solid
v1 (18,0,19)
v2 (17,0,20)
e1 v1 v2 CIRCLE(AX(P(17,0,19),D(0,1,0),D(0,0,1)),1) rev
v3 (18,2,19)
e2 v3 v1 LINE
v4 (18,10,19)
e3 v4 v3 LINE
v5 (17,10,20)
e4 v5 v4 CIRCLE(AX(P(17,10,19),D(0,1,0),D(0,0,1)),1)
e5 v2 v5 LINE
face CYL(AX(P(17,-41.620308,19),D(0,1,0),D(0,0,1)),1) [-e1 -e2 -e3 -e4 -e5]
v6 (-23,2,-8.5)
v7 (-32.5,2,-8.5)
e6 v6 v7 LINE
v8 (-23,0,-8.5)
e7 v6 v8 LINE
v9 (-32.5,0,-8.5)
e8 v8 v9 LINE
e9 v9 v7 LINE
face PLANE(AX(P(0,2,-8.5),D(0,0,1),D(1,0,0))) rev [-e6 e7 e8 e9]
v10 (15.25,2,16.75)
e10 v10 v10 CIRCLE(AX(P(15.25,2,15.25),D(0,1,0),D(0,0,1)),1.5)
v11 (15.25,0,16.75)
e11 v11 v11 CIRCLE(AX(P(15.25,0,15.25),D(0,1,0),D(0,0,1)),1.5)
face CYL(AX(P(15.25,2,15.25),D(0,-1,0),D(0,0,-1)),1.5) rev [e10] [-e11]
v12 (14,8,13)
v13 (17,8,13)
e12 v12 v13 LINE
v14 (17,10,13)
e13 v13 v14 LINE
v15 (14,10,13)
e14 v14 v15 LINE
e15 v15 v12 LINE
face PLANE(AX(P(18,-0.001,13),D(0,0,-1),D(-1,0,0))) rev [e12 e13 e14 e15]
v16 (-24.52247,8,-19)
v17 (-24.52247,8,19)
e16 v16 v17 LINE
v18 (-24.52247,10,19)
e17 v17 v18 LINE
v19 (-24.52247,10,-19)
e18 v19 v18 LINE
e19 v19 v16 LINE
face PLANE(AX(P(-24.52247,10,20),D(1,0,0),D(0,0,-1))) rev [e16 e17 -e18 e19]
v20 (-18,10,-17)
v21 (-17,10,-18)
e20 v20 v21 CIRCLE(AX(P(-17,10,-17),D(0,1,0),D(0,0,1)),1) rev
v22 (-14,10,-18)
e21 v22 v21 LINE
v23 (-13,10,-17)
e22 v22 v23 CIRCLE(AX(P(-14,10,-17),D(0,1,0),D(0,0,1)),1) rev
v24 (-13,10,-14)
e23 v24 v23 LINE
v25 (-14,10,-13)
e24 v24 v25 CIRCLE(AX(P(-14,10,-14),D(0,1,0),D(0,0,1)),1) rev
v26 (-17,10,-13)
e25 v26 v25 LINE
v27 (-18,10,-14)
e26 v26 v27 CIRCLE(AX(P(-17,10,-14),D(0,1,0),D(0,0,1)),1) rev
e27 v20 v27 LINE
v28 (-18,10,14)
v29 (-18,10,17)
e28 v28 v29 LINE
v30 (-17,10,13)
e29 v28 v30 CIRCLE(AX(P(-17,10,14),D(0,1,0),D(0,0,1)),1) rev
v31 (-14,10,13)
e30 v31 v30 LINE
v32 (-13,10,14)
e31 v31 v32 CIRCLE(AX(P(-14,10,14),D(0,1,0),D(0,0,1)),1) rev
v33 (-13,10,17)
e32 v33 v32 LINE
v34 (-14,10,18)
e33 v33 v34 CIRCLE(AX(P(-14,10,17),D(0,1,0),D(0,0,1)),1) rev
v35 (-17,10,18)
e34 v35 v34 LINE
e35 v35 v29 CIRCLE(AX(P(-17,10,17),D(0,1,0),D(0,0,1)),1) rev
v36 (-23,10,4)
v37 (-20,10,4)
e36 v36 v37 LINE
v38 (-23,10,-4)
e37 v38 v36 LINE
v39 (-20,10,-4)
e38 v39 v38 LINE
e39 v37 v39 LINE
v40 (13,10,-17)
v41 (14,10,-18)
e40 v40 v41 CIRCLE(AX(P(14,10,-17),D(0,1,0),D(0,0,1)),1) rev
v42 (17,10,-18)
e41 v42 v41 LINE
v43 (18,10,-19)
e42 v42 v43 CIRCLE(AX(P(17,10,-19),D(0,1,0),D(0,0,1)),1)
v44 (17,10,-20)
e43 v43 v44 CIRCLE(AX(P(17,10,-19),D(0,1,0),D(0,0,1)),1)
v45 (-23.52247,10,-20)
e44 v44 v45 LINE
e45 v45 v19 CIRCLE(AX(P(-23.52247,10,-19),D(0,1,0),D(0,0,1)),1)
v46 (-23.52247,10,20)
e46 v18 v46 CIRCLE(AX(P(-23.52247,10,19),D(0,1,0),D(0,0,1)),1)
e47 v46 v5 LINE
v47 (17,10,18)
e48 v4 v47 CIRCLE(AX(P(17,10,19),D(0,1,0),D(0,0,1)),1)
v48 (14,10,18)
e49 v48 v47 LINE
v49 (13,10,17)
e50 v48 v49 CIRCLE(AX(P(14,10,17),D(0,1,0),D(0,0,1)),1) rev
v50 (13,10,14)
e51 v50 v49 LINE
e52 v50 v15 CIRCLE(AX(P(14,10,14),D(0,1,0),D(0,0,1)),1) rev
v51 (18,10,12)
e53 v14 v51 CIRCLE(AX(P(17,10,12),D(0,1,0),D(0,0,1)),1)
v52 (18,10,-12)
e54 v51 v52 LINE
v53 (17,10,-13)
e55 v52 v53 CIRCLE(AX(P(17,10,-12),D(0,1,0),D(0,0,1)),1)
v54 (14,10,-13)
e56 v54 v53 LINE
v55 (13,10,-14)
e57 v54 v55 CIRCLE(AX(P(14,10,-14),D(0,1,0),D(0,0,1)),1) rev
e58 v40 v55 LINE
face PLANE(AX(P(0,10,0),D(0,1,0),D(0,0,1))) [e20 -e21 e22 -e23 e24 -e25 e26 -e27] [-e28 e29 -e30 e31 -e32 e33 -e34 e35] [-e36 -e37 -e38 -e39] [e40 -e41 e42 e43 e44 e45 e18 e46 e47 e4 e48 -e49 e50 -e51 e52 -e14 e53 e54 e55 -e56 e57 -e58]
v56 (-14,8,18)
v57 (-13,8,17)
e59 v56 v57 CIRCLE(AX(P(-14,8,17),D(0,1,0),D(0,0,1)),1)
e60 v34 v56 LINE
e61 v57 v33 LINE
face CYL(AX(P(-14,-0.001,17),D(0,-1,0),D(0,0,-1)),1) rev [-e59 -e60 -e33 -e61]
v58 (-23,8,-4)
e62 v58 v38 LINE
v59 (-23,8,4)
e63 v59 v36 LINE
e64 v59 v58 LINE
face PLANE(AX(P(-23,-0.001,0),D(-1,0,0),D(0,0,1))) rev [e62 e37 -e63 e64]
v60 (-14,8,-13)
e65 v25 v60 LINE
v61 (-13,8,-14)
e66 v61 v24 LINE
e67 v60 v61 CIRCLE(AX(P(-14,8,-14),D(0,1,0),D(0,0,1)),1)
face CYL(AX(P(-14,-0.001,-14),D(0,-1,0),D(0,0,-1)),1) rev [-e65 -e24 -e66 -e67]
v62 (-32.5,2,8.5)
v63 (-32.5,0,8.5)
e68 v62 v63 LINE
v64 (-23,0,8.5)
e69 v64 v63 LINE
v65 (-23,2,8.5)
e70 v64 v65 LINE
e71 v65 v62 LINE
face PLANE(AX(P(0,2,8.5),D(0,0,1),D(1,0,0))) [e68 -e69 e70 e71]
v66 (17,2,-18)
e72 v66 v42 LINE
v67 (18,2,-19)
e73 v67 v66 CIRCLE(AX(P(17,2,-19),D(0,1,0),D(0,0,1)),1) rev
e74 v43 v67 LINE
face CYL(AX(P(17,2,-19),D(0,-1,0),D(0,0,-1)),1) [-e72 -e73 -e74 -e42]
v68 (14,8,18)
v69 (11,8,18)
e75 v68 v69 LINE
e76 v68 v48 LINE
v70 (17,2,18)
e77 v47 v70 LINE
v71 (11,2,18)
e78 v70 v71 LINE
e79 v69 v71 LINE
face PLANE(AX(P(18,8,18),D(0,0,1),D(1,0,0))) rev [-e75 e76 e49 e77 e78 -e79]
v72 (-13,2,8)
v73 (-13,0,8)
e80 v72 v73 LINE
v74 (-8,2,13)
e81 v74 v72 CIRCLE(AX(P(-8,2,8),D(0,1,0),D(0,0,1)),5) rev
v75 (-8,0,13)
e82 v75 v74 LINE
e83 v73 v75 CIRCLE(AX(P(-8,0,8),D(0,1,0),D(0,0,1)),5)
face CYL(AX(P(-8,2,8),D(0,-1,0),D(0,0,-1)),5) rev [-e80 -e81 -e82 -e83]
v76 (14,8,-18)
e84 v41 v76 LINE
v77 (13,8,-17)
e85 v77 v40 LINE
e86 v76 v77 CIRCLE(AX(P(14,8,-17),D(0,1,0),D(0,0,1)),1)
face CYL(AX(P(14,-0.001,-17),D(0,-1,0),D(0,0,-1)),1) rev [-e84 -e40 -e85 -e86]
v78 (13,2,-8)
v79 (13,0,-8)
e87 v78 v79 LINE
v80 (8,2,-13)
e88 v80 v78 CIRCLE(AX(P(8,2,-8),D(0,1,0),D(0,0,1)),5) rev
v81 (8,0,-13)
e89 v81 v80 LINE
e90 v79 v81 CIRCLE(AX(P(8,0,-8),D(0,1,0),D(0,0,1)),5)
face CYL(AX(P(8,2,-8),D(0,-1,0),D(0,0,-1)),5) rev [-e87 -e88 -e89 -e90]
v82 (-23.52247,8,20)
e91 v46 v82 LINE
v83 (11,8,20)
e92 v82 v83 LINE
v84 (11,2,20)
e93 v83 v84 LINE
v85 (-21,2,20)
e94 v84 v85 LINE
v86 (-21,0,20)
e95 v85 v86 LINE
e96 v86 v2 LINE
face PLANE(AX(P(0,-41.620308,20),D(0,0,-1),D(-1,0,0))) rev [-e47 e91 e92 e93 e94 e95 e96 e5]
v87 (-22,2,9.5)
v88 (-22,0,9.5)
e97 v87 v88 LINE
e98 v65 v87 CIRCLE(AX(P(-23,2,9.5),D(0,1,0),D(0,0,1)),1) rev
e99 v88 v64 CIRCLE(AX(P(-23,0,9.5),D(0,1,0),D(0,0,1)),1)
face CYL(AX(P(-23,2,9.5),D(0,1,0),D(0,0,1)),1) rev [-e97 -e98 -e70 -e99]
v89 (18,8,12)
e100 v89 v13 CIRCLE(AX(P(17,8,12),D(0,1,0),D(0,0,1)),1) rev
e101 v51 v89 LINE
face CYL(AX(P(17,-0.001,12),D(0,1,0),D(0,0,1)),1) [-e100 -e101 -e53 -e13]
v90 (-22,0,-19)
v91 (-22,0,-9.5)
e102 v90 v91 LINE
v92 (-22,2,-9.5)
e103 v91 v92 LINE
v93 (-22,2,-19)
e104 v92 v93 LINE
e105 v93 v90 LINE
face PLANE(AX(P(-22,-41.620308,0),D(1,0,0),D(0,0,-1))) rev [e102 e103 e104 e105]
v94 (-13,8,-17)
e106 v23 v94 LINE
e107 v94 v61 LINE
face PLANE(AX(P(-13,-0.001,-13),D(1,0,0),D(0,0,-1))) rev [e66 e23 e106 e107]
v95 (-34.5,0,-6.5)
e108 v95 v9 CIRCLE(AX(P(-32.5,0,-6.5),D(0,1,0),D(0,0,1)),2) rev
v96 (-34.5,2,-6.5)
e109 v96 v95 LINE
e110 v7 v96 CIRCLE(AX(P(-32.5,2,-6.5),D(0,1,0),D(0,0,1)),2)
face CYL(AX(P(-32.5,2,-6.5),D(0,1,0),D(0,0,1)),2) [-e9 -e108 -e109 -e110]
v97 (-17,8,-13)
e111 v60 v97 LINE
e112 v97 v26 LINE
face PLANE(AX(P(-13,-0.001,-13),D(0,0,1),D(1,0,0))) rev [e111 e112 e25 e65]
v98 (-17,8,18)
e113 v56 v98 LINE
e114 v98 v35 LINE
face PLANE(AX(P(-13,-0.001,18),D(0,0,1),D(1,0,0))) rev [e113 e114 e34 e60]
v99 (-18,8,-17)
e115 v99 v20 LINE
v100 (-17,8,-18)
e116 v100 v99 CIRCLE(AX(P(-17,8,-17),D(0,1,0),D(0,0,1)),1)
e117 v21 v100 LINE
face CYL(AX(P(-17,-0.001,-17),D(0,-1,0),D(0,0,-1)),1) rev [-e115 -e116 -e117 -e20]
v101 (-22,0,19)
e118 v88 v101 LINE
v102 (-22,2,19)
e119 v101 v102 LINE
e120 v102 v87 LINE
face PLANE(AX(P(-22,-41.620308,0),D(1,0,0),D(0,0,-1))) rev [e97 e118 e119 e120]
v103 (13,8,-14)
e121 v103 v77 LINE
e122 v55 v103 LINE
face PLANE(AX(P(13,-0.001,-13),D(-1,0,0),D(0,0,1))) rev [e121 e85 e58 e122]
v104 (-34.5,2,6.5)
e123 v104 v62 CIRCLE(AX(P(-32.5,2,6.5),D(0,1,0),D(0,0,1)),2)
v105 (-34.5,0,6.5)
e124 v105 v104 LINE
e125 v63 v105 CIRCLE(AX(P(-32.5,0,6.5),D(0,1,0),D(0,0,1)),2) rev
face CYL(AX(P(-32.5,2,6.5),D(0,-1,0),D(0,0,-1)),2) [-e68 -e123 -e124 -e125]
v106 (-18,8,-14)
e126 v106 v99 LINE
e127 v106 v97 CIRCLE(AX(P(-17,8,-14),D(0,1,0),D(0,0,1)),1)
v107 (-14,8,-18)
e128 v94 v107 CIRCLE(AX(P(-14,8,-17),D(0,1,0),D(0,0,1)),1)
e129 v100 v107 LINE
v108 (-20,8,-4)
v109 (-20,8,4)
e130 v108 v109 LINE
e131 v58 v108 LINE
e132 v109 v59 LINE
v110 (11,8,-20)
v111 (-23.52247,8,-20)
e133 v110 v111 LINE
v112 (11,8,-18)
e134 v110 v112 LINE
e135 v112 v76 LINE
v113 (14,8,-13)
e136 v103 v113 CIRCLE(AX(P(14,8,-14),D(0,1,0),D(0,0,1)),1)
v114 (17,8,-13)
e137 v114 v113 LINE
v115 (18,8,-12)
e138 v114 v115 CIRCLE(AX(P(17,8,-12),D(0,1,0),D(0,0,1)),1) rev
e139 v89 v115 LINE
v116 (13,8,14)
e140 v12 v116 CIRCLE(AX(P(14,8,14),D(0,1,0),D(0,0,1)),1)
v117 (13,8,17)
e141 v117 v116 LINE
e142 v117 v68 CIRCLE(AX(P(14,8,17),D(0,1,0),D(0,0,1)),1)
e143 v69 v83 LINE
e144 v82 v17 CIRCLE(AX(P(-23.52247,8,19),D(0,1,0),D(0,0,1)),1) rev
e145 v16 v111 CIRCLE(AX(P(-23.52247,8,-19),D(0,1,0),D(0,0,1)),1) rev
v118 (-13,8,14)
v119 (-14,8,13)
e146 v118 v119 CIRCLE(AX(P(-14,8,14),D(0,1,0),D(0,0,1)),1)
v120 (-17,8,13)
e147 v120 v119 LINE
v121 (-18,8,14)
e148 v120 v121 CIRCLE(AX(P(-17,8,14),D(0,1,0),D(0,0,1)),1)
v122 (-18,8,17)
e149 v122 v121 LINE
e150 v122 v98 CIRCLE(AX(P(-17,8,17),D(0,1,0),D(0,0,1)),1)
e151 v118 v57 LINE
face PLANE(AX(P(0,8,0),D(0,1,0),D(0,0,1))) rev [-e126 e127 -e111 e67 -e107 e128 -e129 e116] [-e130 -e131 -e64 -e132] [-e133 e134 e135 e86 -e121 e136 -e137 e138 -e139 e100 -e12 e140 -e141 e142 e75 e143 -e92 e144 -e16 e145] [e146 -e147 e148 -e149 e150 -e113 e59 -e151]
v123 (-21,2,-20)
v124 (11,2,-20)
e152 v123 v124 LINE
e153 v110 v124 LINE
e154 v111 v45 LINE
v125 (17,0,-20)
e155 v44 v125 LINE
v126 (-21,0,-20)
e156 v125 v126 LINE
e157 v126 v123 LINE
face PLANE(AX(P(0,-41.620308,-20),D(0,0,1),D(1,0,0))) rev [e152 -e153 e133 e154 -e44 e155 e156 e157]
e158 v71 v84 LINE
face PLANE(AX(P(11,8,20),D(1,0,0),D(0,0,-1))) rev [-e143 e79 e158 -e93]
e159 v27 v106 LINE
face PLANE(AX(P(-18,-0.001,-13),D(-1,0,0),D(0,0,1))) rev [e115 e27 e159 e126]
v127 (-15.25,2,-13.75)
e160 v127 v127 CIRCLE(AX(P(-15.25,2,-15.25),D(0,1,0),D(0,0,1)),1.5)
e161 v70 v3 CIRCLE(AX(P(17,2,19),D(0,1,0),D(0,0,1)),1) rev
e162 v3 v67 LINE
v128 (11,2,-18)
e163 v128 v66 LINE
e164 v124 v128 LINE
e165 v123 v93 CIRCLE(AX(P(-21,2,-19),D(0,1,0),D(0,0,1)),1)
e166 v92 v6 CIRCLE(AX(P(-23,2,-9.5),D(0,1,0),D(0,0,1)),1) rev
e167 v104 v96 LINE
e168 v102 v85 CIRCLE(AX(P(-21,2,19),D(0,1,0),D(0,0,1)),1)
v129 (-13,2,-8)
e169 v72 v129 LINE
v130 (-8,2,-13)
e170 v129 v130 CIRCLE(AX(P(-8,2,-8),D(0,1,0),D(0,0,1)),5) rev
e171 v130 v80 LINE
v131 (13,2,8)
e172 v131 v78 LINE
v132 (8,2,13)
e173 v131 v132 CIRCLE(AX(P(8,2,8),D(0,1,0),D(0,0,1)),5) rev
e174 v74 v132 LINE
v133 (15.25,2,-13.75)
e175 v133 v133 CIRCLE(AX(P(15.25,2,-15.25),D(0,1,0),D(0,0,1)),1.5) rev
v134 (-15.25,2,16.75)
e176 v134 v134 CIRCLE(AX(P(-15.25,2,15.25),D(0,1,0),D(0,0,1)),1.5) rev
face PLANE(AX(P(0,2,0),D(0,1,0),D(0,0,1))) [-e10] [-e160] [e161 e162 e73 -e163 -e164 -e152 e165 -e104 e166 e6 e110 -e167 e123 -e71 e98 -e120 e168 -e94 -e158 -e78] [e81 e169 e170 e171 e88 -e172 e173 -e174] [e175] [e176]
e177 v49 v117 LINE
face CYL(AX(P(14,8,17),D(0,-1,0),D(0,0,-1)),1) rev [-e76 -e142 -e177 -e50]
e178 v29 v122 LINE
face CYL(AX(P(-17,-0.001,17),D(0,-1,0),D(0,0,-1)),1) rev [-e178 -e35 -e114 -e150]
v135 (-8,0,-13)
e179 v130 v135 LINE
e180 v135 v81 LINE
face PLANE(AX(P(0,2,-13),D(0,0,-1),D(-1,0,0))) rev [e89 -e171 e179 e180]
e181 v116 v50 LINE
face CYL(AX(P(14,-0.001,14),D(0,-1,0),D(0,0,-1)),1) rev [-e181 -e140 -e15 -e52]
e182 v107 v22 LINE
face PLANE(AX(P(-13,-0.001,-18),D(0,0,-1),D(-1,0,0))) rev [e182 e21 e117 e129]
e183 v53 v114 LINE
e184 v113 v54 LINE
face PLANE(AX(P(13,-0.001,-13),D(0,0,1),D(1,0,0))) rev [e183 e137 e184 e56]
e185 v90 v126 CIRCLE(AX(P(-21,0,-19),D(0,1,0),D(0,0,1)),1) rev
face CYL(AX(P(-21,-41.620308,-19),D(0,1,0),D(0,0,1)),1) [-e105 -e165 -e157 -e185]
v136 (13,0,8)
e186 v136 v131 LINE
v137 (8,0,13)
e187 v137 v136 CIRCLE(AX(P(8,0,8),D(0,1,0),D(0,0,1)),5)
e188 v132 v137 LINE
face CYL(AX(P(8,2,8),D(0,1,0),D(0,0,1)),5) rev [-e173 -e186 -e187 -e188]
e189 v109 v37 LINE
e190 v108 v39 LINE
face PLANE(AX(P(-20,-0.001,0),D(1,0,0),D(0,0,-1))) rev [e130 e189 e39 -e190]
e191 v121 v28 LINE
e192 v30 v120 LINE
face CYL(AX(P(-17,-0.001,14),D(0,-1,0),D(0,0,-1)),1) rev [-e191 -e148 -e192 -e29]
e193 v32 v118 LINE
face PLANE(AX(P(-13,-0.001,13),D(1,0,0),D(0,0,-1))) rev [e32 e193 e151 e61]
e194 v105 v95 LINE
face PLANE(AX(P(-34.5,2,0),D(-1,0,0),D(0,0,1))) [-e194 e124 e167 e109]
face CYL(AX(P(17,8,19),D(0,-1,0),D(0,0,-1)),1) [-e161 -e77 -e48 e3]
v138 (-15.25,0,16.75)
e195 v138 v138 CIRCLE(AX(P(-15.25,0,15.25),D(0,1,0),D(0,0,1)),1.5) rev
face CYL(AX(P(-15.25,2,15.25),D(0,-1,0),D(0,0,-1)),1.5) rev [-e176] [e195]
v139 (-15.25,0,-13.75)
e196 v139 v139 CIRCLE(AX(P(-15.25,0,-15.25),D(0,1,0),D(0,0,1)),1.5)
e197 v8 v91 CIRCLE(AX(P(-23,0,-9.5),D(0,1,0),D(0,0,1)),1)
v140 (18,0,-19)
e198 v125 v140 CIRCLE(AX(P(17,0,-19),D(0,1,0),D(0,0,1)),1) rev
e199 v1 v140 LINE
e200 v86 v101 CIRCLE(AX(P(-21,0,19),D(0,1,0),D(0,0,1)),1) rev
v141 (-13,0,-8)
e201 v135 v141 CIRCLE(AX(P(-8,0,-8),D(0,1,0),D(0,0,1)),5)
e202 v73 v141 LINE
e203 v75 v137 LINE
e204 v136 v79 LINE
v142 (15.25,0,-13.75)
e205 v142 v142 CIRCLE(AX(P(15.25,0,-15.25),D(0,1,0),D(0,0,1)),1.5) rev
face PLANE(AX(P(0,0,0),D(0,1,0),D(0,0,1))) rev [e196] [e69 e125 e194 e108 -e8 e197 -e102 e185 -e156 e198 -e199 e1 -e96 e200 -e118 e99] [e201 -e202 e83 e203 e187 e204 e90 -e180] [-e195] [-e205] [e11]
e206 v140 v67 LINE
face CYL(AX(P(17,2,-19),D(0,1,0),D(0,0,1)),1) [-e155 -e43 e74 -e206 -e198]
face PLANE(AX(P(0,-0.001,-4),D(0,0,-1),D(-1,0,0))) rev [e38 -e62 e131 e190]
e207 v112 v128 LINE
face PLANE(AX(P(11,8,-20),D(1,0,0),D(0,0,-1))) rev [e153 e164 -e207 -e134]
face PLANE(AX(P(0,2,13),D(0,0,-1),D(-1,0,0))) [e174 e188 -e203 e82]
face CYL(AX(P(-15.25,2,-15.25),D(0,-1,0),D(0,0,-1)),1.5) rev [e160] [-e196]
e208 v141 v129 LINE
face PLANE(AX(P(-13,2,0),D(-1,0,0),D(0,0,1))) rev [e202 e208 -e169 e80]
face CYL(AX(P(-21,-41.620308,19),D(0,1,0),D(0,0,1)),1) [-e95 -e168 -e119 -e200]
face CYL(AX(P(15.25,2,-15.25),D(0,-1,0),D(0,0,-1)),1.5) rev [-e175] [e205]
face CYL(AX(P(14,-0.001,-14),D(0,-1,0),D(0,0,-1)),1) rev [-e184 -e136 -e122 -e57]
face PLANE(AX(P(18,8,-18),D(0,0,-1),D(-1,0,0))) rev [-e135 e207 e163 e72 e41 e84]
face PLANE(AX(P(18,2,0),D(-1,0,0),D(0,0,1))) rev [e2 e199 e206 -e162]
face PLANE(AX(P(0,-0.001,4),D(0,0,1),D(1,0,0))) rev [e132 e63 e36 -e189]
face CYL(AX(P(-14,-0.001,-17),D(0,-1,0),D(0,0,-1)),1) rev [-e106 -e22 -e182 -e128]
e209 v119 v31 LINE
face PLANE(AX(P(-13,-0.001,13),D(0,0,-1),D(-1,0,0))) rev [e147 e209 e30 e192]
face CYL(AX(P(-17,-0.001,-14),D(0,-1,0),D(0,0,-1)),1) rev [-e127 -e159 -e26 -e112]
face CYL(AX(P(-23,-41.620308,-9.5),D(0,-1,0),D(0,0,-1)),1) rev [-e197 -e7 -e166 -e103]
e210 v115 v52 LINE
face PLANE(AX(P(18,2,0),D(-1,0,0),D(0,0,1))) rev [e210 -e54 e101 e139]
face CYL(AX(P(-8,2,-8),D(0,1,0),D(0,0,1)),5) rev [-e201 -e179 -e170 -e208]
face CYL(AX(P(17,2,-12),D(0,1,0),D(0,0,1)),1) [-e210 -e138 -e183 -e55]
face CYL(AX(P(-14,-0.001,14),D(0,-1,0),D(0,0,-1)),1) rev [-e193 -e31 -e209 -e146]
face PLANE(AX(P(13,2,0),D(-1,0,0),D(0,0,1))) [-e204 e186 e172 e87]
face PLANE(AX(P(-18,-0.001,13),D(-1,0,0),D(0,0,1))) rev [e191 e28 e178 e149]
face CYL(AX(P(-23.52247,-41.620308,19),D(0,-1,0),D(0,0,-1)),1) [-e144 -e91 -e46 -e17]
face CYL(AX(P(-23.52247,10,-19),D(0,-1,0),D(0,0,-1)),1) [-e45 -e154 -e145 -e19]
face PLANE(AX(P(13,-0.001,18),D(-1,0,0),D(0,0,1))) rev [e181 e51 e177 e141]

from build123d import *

# Parameters (mm, degrees)
CROQUIS1_W              = 16.5
CROQUIS1_H              = 17
CROQUIS1_R              = 1.5
CROQUIS1_W_2            = 5
SALIENTE_EXTRUIR1_DEPTH = 2
SALIENTE_EXTRUIR2_DEPTH = 2
CROQUIS4_W              = 7
CROQUIS4_H              = 2
SALIENTE_EXTRUIR3_DEPTH = 6
CROQUIS7_W              = 42.522469992
CROQUIS7_H              = 40
SALIENTE_EXTRUIR5_DEPTH = 2
CORTAR_EXTRUIR1_REACH   = 43.113
CROQUIS8_W              = 5
CROQUIS8_H              = 5
REDONDEO1_R             = 5
REDONDEO2_R             = 2
CORTAR_EXTRUIR3_REACH   = 43.113
CROQUIS12_W             = 3
CROQUIS12_H             = 8
REDONDEO3_R             = 1


with BuildPart() as part:
    # Croquis1 → Saliente-Extruir1 (new body)
    # profile 1 of 3: a face of its own
    with BuildSketch(Plane(origin=(0, 0, 0), x_dir=(1, 0, 0), z_dir=(0, 1, 0))):
        with Locations((-26.25, 0)):
            Rectangle(CROQUIS1_W, CROQUIS1_H)
    # profile 2 of 3: a face of its own
    with BuildSketch(Plane(origin=(0, 0, 0), x_dir=(1, 0, 0), z_dir=(0, 1, 0))):
        Polygon((13, -13), (-13, -13), (-13, -8.5), (-18, -8.5), (-18, -18), (18, -18), (18, 18), (-18, 18), (-18, 8.5), (-13, 8.5), (-13, 13), (13, 13), align=None)
        with Locations(Location((-15.25, -15.25, 0), (0, 0, 270))):
            Circle(CROQUIS1_R, mode=Mode.SUBTRACT)
        with Locations(Location((15.25, -15.25, 0), (0, 0, 270))):
            Circle(CROQUIS1_R, mode=Mode.SUBTRACT)
        with Locations(Location((-15.25, 15.25, 0), (0, 0, 270))):
            Circle(CROQUIS1_R, mode=Mode.SUBTRACT)
        with Locations(Location((15.25, 15.25, 0), (0, 0, 270))):
            Circle(CROQUIS1_R, mode=Mode.SUBTRACT)
    # profile 3 of 3: a face of its own
    with BuildSketch(Plane(origin=(0, 0, 0), x_dir=(1, 0, 0), z_dir=(0, 1, 0))):
        with Locations((-15.5, 0)):
            Rectangle(CROQUIS1_W_2, CROQUIS1_H)
    extrude(amount=SALIENTE_EXTRUIR1_DEPTH)

    # Croquis2 → Saliente-Extruir2 (add)
    with BuildSketch(Plane(origin=(0, 2, 0), x_dir=(1, 0, 0), z_dir=(0, 1, 0))):
        Polygon((18, 18), (18, 20), (-22, 20), (-22, 8.5), (-18, 8.5), (-18, 18), align=None)
        Polygon((18, -20), (18, -18), (-18, -18), (-18, -8.5), (-22, -8.5), (-22, -20), align=None)
    extrude(amount=-SALIENTE_EXTRUIR2_DEPTH)

    # Croquis4 → Saliente-Extruir3 (add)
    with BuildSketch(Plane(origin=(0, 2, 0), x_dir=(1, 0, 0), z_dir=(0, 1, 0))):
        with Locations((14.5, -19)):
            Rectangle(CROQUIS4_W, CROQUIS4_H)
        with Locations((14.5, 19)):
            Rectangle(CROQUIS4_W, CROQUIS4_H)
    extrude(amount=SALIENTE_EXTRUIR3_DEPTH)

    # Croquis7 → Saliente-Extruir5 (add)
    with BuildSketch(Plane(origin=(0, 8, 0), x_dir=(1, 0, 0), z_dir=(0, 1, 0))):
        with Locations((-3.261234996, 0)):
            Rectangle(CROQUIS7_W, CROQUIS7_H)
    extrude(amount=SALIENTE_EXTRUIR5_DEPTH)

    # Croquis8 → Cortar-Extruir1 (cut, up to next)
    with BuildSketch(Plane(origin=(0, 10, 0), x_dir=(1, 0, 0), z_dir=(0, 1, 0)), mode=Mode.PRIVATE) as cortar_extruir1_sk1:
        with Locations((15.5, -15.5)):
            Rectangle(CROQUIS8_W, CROQUIS8_H)
    cortar_extruir1_tool1 = extrude(cortar_extruir1_sk1.sketch, amount=-CORTAR_EXTRUIR1_REACH, mode=Mode.PRIVATE) & part.part
    # Croquis8 → Cortar-Extruir1 (cut, up to next)
    with BuildSketch(Plane(origin=(0, 10, 0), x_dir=(1, 0, 0), z_dir=(0, 1, 0)), mode=Mode.PRIVATE) as cortar_extruir1_sk2:
        with Locations((15.5, 15.5)):
            Rectangle(CROQUIS8_W, CROQUIS8_H)
    cortar_extruir1_tool2 = extrude(cortar_extruir1_sk2.sketch, amount=-CORTAR_EXTRUIR1_REACH, mode=Mode.PRIVATE) & part.part
    # Croquis8 → Cortar-Extruir1 (cut, up to next)
    with BuildSketch(Plane(origin=(0, 10, 0), x_dir=(1, 0, 0), z_dir=(0, 1, 0)), mode=Mode.PRIVATE) as cortar_extruir1_sk3:
        with Locations((-15.5, 15.5)):
            Rectangle(CROQUIS8_W, CROQUIS8_H)
    cortar_extruir1_tool3 = extrude(cortar_extruir1_sk3.sketch, amount=-CORTAR_EXTRUIR1_REACH, mode=Mode.PRIVATE) & part.part
    # Croquis8 → Cortar-Extruir1 (cut, up to next)
    with BuildSketch(Plane(origin=(0, 10, 0), x_dir=(1, 0, 0), z_dir=(0, 1, 0)), mode=Mode.PRIVATE) as cortar_extruir1_sk4:
        with Locations((-15.5, -15.5)):
            Rectangle(CROQUIS8_W, CROQUIS8_H)
    cortar_extruir1_tool4 = extrude(cortar_extruir1_sk4.sketch, amount=-CORTAR_EXTRUIR1_REACH, mode=Mode.PRIVATE) & part.part
    add(cortar_extruir1_tool1.solids().sort_by_distance((15.5, 10, 15.5))[0], mode=Mode.SUBTRACT)
    add(cortar_extruir1_tool2.solids().sort_by_distance((15.5, 10, -15.5))[0], mode=Mode.SUBTRACT)
    add(cortar_extruir1_tool3.solids().sort_by_distance((-15.5, 10, -15.5))[0], mode=Mode.SUBTRACT)
    add(cortar_extruir1_tool4.solids().sort_by_distance((-15.5, 10, 15.5))[0], mode=Mode.SUBTRACT)

    # Redondeo1
    redondeo1_edges = [part.edges().sort_by_distance(p)[0] for p in [
        (-13, 1, 13),
        (13, 1, 13),
        (13, 1, -13),
        (-13, 1, -13),
    ]]
    fillet(redondeo1_edges, radius=REDONDEO1_R)

    # Redondeo2
    redondeo2_edges = [part.edges().sort_by_distance(p)[0] for p in [
        (-34.5, 1, 8.5),
        (-34.5, 1, -8.5),
    ]]
    fillet(redondeo2_edges, radius=REDONDEO2_R)

    # Croquis12 → Cortar-Extruir3 (cut, up to next)
    with BuildSketch(Plane(origin=(0, 10, 0), x_dir=(1, 0, 0), z_dir=(0, 1, 0)), mode=Mode.PRIVATE) as cortar_extruir3_sk1:
        with Locations((-21.5, 0)):
            Rectangle(CROQUIS12_W, CROQUIS12_H)
    cortar_extruir3_tool1 = extrude(cortar_extruir3_sk1.sketch, amount=-CORTAR_EXTRUIR3_REACH, mode=Mode.PRIVATE) & part.part
    add(cortar_extruir3_tool1.solids().sort_by_distance((-21.5, 10, 0))[0], mode=Mode.SUBTRACT)

    # Redondeo3
    redondeo3_edges = [part.edges().sort_by_distance(p)[0] for p in [
        (-24.522469992, 9, -20),
        (-24.522469992, 9, 20),
        (-18, 9, 13),
        (-18, 9, 18),
        (-13, 9, 18),
        (-13, 9, 13),
        (-18, 9, -18),
        (-18, 9, -13),
        (-13, 9, -13),
        (-13, 9, -18),
        (18, 9, -13),
        (13, 9, -18),
        (13, 9, -13),
        (13, 9, 13),
        (13, 9, 18),
        (18, 9, 13),
        (-22, 1, -8.5),
        (18, 5, -20),
        (-22, 1, -20),
        (18, 5, 20),
        (-22, 1, 8.5),
        (-22, 1, 20),
        (18, 6, 18),
        (18, 6, -18),
    ]]
    fillet(redondeo3_edges, radius=REDONDEO3_R - 0.0001)  # a hair under: the kernel refuses the full size


solid = part.part
